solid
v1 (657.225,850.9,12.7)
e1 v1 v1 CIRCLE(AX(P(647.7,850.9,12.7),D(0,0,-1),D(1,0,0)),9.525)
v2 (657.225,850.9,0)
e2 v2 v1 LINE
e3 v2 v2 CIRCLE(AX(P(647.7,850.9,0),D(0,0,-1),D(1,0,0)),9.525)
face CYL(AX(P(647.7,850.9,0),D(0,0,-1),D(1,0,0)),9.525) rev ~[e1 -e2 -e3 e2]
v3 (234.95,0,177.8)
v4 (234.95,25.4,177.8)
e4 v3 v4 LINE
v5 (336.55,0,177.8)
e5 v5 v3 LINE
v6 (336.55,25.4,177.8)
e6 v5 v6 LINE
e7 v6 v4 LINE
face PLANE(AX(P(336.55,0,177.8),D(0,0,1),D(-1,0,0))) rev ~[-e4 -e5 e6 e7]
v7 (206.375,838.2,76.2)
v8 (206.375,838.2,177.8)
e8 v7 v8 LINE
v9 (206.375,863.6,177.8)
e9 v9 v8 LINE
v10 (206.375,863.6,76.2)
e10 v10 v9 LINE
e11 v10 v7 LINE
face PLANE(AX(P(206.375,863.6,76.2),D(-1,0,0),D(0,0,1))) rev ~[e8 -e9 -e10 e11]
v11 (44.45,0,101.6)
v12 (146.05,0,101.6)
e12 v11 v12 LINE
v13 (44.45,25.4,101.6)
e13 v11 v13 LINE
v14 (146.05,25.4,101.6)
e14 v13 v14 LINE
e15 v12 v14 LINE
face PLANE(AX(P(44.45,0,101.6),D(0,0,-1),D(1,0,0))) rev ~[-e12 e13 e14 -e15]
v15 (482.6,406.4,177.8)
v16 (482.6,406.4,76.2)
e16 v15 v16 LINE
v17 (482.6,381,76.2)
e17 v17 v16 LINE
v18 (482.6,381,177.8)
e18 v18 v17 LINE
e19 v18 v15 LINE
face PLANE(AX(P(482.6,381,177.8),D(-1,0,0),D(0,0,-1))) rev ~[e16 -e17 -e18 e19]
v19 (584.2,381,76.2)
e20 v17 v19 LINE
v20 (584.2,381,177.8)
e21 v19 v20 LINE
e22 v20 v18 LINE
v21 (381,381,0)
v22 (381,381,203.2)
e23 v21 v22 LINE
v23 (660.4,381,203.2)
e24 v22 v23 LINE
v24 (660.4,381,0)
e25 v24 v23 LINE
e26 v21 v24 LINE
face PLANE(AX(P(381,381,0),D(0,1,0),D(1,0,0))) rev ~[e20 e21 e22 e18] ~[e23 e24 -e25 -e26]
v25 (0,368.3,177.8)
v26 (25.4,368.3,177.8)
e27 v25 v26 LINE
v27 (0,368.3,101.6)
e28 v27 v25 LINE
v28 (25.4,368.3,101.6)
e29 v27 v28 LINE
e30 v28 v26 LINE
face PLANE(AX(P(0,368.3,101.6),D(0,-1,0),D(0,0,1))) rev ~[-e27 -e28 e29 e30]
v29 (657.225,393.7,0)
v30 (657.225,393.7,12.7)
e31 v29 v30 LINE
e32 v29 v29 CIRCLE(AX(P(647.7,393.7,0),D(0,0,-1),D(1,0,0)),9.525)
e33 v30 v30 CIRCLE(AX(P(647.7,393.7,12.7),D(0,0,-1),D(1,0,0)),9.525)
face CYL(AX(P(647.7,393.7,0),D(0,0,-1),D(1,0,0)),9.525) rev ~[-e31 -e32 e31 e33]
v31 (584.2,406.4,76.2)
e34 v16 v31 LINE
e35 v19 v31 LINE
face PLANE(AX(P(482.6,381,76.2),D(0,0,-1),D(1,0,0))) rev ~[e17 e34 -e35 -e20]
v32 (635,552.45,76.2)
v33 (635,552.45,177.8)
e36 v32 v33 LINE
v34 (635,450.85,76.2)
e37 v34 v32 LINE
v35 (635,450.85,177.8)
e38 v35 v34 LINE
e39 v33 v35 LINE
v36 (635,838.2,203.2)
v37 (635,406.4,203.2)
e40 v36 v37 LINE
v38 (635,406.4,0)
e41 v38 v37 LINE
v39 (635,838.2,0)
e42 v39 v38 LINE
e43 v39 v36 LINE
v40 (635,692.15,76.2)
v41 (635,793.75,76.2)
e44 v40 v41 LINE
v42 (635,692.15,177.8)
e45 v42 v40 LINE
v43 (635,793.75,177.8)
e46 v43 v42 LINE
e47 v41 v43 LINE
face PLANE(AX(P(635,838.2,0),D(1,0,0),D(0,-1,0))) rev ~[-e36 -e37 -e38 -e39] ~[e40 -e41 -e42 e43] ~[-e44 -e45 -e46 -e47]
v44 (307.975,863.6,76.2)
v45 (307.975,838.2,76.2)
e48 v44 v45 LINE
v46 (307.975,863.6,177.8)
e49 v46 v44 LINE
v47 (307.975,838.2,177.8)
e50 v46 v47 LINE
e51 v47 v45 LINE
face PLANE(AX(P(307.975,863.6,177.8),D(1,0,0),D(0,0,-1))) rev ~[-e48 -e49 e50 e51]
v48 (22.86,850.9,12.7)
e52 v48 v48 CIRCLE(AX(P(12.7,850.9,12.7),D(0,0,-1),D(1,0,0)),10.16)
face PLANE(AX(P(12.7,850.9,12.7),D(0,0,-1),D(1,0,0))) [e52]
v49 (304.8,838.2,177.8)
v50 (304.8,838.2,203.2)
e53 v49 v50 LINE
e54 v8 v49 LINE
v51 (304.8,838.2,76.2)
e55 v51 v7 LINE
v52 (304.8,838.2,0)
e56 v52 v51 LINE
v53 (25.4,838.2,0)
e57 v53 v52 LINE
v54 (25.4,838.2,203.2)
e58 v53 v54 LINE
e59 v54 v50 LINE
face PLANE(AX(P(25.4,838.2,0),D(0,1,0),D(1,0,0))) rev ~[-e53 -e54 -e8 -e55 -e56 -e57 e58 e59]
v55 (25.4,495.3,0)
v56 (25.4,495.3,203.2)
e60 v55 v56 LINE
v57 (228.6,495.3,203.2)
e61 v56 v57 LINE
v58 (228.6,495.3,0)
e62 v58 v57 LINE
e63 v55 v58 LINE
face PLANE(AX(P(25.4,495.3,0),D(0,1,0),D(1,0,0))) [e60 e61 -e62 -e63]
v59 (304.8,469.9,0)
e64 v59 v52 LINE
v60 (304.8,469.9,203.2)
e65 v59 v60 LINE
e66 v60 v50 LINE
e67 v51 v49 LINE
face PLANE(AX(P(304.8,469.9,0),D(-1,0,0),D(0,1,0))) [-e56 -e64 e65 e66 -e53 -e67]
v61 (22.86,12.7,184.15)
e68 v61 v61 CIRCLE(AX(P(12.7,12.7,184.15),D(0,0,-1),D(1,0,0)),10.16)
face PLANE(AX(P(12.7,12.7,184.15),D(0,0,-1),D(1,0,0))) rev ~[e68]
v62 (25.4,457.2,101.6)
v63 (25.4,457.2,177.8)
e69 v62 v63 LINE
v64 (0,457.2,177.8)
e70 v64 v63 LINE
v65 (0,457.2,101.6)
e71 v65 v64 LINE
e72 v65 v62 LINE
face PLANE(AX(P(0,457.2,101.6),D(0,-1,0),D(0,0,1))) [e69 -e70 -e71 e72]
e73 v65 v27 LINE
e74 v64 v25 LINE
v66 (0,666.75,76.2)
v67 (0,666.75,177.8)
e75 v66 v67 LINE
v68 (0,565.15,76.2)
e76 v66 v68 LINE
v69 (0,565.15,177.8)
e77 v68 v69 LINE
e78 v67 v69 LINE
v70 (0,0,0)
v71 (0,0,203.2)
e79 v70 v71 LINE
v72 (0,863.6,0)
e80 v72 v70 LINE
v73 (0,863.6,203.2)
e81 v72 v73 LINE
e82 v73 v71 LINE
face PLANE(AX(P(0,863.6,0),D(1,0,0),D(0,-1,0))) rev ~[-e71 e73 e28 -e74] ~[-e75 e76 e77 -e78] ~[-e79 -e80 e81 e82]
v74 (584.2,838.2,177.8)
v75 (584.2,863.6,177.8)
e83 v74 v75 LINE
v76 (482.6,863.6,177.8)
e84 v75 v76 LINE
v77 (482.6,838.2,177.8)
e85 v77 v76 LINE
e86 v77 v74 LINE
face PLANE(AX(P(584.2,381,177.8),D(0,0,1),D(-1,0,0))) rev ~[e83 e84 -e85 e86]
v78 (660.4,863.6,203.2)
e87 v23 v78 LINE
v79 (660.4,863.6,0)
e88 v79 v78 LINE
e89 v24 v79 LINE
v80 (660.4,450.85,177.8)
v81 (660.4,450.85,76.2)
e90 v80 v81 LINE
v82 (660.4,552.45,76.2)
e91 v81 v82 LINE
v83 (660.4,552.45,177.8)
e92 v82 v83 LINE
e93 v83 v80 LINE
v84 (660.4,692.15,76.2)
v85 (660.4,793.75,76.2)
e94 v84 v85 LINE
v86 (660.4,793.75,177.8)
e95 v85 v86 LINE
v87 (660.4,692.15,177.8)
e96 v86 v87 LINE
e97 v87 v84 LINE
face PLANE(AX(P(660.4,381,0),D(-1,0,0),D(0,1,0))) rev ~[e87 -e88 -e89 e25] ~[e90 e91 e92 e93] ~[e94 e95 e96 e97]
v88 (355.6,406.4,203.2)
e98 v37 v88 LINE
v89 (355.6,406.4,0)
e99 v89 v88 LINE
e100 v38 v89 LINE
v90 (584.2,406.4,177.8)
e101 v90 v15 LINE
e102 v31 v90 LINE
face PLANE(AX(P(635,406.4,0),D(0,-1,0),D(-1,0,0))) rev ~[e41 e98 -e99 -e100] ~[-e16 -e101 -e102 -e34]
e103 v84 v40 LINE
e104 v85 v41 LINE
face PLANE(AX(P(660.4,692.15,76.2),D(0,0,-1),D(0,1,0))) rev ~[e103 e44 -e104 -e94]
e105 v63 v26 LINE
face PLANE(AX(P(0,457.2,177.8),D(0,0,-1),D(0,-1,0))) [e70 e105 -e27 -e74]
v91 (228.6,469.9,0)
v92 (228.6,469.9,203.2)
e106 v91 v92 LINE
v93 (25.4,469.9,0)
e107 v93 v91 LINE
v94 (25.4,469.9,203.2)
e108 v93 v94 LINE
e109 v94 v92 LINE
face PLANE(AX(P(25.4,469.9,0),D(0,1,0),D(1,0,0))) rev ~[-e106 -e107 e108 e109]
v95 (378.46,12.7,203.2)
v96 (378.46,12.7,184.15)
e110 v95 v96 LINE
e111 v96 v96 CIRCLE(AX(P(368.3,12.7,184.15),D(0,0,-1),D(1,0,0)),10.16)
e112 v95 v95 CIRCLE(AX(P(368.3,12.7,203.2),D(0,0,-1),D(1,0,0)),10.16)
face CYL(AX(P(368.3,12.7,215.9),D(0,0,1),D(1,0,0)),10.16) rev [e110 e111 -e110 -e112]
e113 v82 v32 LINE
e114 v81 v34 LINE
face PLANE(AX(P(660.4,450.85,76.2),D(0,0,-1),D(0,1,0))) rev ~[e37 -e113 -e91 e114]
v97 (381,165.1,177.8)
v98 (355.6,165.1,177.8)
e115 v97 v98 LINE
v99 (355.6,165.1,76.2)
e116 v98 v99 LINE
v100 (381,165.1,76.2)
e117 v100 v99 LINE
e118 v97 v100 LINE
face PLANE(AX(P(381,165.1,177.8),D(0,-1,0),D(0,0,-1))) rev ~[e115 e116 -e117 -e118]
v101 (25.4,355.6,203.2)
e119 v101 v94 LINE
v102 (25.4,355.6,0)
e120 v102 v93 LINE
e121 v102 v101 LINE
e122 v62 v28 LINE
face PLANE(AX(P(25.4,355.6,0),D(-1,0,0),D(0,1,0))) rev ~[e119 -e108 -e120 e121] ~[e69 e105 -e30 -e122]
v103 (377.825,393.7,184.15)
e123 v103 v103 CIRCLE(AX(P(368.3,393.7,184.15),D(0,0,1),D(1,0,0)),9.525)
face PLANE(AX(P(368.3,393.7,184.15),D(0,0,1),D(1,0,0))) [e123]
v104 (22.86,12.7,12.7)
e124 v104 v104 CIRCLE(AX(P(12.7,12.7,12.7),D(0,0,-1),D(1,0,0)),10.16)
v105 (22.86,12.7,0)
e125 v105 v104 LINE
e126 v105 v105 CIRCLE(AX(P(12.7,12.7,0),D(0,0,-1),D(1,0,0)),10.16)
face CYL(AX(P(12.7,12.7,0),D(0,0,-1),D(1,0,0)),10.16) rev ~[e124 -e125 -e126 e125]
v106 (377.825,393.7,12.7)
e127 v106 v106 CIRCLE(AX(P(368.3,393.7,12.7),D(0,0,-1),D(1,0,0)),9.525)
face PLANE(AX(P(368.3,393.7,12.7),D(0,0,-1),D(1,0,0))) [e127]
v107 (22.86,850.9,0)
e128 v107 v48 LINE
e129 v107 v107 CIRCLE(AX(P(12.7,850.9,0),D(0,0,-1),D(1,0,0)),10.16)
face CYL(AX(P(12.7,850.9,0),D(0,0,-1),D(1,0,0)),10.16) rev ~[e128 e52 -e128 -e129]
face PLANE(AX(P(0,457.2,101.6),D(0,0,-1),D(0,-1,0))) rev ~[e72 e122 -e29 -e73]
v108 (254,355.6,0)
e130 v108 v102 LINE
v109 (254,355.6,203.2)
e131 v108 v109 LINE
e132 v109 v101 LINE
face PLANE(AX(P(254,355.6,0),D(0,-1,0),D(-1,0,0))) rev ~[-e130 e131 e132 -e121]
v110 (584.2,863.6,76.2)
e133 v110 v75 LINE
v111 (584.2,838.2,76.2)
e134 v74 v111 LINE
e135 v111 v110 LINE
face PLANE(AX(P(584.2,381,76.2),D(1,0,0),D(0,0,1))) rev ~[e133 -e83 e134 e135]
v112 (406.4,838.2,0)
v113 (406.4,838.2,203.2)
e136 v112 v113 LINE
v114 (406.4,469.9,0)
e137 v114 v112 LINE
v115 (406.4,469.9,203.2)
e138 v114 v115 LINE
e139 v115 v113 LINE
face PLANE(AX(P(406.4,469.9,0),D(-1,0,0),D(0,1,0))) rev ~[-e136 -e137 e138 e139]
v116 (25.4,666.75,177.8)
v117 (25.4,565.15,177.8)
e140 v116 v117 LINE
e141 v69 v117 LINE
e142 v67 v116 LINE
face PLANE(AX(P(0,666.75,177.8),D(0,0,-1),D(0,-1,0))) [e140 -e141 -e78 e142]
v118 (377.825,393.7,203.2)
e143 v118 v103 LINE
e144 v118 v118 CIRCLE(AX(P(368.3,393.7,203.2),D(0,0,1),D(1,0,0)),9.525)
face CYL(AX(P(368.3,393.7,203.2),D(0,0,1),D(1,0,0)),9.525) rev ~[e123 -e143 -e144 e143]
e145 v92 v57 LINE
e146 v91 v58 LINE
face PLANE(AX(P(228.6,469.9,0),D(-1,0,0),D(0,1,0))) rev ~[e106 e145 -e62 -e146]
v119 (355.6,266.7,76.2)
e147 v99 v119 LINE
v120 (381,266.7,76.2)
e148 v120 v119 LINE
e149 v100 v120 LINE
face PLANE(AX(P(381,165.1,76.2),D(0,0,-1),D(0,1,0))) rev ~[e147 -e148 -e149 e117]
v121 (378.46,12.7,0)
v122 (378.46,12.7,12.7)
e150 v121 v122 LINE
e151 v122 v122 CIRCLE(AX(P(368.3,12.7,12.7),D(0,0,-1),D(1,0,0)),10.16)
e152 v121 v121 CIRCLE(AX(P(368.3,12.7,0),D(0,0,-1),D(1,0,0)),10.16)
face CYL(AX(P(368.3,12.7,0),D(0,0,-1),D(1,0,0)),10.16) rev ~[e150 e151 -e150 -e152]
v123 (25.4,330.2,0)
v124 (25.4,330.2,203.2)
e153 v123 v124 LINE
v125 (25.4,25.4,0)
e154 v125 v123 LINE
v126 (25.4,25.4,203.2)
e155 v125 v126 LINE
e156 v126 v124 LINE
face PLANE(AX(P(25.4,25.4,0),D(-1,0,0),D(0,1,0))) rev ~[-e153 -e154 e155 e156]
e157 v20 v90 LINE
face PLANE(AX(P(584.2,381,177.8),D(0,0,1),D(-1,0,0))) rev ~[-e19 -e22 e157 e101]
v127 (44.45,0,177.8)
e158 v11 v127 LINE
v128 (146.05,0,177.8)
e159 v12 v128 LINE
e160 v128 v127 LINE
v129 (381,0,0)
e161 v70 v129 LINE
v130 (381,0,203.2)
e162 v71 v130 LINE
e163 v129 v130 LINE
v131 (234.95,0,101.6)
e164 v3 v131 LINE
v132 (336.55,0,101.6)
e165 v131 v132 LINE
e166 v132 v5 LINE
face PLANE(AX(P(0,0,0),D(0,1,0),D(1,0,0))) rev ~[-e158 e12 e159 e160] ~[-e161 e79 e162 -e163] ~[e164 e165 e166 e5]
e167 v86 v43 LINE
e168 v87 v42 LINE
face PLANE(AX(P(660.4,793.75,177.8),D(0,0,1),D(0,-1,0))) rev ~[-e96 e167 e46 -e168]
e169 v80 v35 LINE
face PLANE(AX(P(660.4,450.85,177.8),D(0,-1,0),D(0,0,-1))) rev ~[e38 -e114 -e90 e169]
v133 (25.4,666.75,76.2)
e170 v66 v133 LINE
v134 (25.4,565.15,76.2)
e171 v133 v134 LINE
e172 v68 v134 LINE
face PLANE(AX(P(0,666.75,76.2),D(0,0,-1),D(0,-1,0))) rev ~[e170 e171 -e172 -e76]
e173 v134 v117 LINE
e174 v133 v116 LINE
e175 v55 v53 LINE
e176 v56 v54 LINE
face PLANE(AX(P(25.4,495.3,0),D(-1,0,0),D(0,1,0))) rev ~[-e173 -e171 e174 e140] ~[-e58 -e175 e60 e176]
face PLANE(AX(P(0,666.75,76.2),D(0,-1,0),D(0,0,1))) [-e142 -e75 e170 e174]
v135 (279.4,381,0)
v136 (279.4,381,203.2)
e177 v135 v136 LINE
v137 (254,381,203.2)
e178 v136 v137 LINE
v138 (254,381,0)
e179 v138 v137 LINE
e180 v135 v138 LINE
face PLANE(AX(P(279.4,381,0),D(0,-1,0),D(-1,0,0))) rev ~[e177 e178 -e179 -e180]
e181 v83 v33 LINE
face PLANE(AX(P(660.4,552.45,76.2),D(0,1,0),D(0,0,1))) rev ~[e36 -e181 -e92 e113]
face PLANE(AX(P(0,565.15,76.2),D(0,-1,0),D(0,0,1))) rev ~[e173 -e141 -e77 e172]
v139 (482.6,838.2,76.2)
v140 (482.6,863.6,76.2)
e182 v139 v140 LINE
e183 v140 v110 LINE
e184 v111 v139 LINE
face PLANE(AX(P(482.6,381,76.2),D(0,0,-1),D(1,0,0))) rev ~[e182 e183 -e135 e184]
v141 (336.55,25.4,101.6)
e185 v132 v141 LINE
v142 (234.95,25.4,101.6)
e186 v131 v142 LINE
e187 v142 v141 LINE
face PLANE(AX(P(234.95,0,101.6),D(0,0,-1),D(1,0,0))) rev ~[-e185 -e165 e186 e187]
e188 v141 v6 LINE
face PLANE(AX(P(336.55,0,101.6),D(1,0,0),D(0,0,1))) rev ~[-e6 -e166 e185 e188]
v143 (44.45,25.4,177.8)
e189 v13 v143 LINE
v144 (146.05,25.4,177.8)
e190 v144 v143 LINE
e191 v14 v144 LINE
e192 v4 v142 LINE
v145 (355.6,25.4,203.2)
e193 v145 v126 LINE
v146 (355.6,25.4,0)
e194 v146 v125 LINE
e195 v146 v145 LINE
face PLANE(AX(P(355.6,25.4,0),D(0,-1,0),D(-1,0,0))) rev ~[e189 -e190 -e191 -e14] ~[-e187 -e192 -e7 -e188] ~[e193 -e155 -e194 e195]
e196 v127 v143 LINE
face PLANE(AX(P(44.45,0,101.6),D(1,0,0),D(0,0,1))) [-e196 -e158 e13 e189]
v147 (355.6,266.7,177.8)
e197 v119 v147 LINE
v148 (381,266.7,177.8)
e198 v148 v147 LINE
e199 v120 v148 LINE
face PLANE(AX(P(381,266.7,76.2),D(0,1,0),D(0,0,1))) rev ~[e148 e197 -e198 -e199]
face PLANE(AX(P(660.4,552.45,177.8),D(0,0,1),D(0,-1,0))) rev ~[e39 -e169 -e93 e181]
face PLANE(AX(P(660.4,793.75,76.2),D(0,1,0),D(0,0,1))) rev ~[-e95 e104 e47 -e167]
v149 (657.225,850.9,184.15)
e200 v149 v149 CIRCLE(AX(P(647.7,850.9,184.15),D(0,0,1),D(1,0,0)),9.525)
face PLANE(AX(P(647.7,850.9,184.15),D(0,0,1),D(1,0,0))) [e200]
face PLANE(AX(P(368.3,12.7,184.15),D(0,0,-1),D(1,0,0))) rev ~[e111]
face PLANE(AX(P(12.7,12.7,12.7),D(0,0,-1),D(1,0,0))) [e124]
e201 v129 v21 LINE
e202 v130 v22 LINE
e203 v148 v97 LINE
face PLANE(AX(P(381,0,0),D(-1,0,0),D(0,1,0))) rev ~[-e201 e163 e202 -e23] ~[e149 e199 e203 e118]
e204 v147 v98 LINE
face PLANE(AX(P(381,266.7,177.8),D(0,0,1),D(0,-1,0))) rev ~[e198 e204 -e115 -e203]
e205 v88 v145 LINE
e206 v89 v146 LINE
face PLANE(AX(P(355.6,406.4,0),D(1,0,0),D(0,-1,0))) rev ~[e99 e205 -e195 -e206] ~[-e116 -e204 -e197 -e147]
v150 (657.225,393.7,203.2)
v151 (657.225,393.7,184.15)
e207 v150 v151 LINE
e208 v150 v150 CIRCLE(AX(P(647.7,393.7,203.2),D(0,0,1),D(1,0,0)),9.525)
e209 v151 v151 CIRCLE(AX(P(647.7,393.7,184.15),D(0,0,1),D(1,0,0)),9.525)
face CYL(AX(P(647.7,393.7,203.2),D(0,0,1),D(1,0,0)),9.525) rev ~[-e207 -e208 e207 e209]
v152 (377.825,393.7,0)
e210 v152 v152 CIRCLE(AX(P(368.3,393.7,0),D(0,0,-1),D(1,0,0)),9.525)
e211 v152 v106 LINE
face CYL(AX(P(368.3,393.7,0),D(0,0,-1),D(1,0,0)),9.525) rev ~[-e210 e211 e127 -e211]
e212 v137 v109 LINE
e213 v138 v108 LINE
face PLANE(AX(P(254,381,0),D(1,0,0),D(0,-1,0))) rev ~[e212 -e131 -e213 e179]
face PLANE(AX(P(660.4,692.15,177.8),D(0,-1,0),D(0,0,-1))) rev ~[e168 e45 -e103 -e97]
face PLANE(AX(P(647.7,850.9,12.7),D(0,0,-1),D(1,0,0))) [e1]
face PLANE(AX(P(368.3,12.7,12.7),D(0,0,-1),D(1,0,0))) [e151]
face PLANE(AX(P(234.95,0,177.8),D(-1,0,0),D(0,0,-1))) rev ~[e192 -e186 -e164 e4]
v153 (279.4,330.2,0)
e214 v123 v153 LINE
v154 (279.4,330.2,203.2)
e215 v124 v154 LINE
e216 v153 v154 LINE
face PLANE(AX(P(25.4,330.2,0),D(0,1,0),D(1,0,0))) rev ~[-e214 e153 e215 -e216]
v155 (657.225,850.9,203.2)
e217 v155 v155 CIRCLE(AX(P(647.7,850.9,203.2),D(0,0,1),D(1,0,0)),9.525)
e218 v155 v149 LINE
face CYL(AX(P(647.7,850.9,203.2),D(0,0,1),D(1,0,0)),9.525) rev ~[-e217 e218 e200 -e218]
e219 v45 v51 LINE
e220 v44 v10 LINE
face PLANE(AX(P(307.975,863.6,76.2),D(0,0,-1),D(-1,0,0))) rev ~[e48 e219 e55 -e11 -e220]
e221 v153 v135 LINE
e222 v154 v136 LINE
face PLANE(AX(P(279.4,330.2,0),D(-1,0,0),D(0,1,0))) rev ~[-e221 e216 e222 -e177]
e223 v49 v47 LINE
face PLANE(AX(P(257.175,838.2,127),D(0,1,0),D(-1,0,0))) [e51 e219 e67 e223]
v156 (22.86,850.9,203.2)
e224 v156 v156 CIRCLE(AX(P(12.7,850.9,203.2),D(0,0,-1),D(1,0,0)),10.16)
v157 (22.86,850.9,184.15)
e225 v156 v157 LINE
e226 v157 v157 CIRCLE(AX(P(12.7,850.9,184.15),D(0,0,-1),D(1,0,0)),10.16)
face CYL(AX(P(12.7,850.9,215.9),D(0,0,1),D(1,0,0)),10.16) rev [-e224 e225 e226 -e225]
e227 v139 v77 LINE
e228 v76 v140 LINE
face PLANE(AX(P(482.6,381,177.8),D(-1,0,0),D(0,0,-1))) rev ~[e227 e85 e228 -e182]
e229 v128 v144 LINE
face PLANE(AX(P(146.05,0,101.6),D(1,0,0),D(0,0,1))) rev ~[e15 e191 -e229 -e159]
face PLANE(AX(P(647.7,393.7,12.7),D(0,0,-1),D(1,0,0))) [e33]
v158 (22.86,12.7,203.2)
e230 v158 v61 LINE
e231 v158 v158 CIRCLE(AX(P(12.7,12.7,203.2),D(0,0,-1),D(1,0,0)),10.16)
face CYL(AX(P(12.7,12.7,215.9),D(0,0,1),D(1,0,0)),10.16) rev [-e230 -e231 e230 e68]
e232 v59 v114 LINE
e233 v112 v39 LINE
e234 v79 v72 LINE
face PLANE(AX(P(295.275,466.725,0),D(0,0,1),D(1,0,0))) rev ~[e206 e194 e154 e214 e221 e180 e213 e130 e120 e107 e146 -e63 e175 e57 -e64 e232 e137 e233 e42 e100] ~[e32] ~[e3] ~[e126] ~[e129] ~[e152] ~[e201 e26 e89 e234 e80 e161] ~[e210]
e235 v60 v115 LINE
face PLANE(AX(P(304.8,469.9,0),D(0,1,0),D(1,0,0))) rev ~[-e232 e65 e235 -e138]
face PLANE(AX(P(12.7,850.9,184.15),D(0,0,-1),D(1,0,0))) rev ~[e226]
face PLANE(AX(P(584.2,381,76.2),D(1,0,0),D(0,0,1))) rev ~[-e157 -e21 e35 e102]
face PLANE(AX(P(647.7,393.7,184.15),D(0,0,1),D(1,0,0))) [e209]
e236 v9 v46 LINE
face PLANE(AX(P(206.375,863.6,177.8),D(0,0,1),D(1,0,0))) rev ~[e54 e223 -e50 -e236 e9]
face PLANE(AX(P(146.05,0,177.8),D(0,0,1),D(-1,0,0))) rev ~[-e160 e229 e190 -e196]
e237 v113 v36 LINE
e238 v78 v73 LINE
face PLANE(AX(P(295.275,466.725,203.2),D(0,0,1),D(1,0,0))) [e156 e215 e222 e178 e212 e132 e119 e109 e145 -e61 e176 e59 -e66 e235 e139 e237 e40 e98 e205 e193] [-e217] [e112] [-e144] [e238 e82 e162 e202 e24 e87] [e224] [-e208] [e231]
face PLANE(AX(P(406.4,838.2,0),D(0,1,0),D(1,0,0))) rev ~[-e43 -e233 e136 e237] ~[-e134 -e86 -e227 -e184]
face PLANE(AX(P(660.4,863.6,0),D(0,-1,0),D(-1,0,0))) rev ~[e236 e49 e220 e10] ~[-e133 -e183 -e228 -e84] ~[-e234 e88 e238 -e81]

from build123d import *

# Parameters (mm, degrees)
F0_W      = 101.6
F0_H      = 368.3
F0_W_2    = 203.2
F0_H_2    = 25.4
F1_DEPTH  = 203.2
F2_R      = 10.16
F2_R_2    = 9.525
F3_DEPTH  = 12.7
F4_DEPTH  = 203.2
F5_DEPTH  = 31.75
F6_W      = 50.8
F6_H      = 76.2
F7_DEPTH  = 25.4
F9_DEPTH  = 25.4
F11_DEPTH = 2540
F13_DEPTH = 25.4
F15_DEPTH = 25.4
F16_W     = 88.9
F16_H     = 76.2
F17_DEPTH = 25.4
F16_W_2   = 101.6
F16_H_2   = 101.6
F18_DEPTH = 25.4
F19_R     = 9.525
F20_DEPTH = 19.05


# Not quite as in the source:
# - a feature names something its author has since deleted; it is built from what else it names


with BuildPart() as f1:
    # F0 (on Top) → F1 (new body)
    with BuildSketch(Plane.XY):
        Polygon((0, 863.6), (0, 0), (381, 0), (381, 381), (660.4, 381), (660.4, 406.4), (660.4, 838.2), (660.4, 863.6), align=None)
        Polygon((406.4, 838.2), (635, 838.2), (635, 406.4), (355.6, 406.4), (355.6, 25.4), (25.4, 25.4), (25.4, 38.7719720602), (25.4, 330.2), (25.4, 355.6), (25.4, 469.9), (25.4, 495.3), (25.4, 838.2), (304.8, 838.2), align=None, mode=Mode.SUBTRACT)
        with Locations((355.6, 654.05)):
            Rectangle(F0_W, F0_H)
        Polygon((254, 355.6), (25.4, 355.6), (25.4, 330.2), (279.4, 330.2), (279.4, 355.6), (279.4, 381), (254, 381), align=None)
        with Locations((127, 482.6)):
            Rectangle(F0_W_2, F0_H_2)
    extrude(amount=F1_DEPTH)

    # F2 (on face) → F3 (cut)
    with BuildSketch(Plane(origin=(0, 0, 0), x_dir=(1, 0, 0), z_dir=(0, 0, -1))):
        with Locations((12.7, -850.9)):
            Circle(F2_R)
        with Locations((12.7, -12.7)):
            Circle(F2_R)
        with Locations((368.3, -12.7)):
            Circle(F2_R)
        with Locations((647.7, -850.9)):
            Circle(F2_R_2)
        with Locations((368.3, -393.7)):
            Circle(F2_R_2)
        with Locations((647.7, -393.7)):
            Circle(F2_R_2)
    extrude(amount=-F3_DEPTH, mode=Mode.SUBTRACT)

    # F4 (add): faces of the model
    f4_faces = [f1.faces().sort_by_distance(p)[0] for p in [
        (12.7, 12.7, 12.7),
        (368.3, 12.7, 12.7),
        (12.7, 850.9, 12.7),
    ]]
    extrude(f4_faces, amount=-F4_DEPTH)

    # F5 (cut): faces of the model
    f5_faces = [f1.faces().sort_by_distance(p)[0] for p in [
        (12.7, 850.9, 215.9),
        (368.3, 12.7, 215.9),
        (12.7, 12.7, 215.9),
    ]]
    extrude(f5_faces, amount=-F5_DEPTH, mode=Mode.SUBTRACT)

    # F6 (on face) → F7 (cut)
    with BuildSketch(Plane.XZ):
        with Locations((120.65, 139.7)):
            Rectangle(F6_W, F6_H)
        with Locations((69.85, 139.7)):
            Rectangle(F6_W, F6_H)
        Polygon((234.95, 177.8), (234.95, 101.6), (336.55, 101.6), (336.55, 177.8), (285.75, 177.8), align=None)
    extrude(amount=-F7_DEPTH, mode=Mode.SUBTRACT)

    # F8 (on face) → F9 (cut)
    with BuildSketch(Plane.YZ.offset(381)):
        Polygon((165.1, 76.2), (190.5, 76.2), (266.7, 76.2), (266.7, 177.8), (165.1, 177.8), align=None)
    extrude(amount=-F9_DEPTH, mode=Mode.SUBTRACT)

    # F10 (on face) → F11 (cut)
    with BuildSketch(Plane.XZ.offset(-381)):
        Polygon((482.6, 76.2), (533.4, 76.2), (584.2, 76.2), (584.2, 177.8), (482.6, 177.8), align=None)
    extrude(amount=-F11_DEPTH, mode=Mode.SUBTRACT)

    # F12 (on face) → F13 (cut)
    with BuildSketch(Plane.YZ.offset(660.4)):
        Polygon((450.85, 76.2), (501.65, 76.2), (552.45, 76.2), (552.45, 177.8), (450.85, 177.8), align=None)
        Polygon((793.75, 177.8), (692.15, 177.8), (692.15, 76.2), (742.95, 76.2), (793.75, 76.2), align=None)
    extrude(amount=-F13_DEPTH, mode=Mode.SUBTRACT)

    # F14 (on face) → F15 (cut)
    with BuildSketch(Plane(origin=(0, 863.6, 0), x_dir=(-1, 0, 0), z_dir=(0, 1, 0))):
        Polygon((-206.375, 177.8), (-257.175, 177.8), (-307.975, 177.8), (-307.975, 76.2), (-206.375, 76.2), align=None)
    extrude(amount=-F15_DEPTH, mode=Mode.SUBTRACT)

    # F16 (on face) → F17 (cut)
    with BuildSketch(Plane(origin=(0, 0, 0), x_dir=(0, -1, 0), z_dir=(-1, 0, 0))):
        with Locations((-412.75, 139.7)):
            Rectangle(F16_W, F16_H)
    extrude(amount=-F17_DEPTH, mode=Mode.SUBTRACT)

    # F16 (on face) → F18 (cut)
    with BuildSketch(Plane(origin=(0, 0, 0), x_dir=(0, -1, 0), z_dir=(-1, 0, 0))):
        with Locations((-412.75, 139.7)):
            Rectangle(F16_W, F16_H)
        with Locations((-615.95, 127)):
            Rectangle(F16_W_2, F16_H_2)
    extrude(amount=-F18_DEPTH, mode=Mode.SUBTRACT)

    # F19 (on face) → F20 (cut)
    with BuildSketch(Plane.XY.offset(203.2)):
        with Locations((368.3, 393.7)):
            Circle(F19_R)
        with Locations((647.7, 393.7)):
            Circle(F19_R)
        with Locations((647.7, 850.9)):
            Circle(F19_R)
    extrude(amount=-F20_DEPTH, mode=Mode.SUBTRACT)


solid = f1.part
